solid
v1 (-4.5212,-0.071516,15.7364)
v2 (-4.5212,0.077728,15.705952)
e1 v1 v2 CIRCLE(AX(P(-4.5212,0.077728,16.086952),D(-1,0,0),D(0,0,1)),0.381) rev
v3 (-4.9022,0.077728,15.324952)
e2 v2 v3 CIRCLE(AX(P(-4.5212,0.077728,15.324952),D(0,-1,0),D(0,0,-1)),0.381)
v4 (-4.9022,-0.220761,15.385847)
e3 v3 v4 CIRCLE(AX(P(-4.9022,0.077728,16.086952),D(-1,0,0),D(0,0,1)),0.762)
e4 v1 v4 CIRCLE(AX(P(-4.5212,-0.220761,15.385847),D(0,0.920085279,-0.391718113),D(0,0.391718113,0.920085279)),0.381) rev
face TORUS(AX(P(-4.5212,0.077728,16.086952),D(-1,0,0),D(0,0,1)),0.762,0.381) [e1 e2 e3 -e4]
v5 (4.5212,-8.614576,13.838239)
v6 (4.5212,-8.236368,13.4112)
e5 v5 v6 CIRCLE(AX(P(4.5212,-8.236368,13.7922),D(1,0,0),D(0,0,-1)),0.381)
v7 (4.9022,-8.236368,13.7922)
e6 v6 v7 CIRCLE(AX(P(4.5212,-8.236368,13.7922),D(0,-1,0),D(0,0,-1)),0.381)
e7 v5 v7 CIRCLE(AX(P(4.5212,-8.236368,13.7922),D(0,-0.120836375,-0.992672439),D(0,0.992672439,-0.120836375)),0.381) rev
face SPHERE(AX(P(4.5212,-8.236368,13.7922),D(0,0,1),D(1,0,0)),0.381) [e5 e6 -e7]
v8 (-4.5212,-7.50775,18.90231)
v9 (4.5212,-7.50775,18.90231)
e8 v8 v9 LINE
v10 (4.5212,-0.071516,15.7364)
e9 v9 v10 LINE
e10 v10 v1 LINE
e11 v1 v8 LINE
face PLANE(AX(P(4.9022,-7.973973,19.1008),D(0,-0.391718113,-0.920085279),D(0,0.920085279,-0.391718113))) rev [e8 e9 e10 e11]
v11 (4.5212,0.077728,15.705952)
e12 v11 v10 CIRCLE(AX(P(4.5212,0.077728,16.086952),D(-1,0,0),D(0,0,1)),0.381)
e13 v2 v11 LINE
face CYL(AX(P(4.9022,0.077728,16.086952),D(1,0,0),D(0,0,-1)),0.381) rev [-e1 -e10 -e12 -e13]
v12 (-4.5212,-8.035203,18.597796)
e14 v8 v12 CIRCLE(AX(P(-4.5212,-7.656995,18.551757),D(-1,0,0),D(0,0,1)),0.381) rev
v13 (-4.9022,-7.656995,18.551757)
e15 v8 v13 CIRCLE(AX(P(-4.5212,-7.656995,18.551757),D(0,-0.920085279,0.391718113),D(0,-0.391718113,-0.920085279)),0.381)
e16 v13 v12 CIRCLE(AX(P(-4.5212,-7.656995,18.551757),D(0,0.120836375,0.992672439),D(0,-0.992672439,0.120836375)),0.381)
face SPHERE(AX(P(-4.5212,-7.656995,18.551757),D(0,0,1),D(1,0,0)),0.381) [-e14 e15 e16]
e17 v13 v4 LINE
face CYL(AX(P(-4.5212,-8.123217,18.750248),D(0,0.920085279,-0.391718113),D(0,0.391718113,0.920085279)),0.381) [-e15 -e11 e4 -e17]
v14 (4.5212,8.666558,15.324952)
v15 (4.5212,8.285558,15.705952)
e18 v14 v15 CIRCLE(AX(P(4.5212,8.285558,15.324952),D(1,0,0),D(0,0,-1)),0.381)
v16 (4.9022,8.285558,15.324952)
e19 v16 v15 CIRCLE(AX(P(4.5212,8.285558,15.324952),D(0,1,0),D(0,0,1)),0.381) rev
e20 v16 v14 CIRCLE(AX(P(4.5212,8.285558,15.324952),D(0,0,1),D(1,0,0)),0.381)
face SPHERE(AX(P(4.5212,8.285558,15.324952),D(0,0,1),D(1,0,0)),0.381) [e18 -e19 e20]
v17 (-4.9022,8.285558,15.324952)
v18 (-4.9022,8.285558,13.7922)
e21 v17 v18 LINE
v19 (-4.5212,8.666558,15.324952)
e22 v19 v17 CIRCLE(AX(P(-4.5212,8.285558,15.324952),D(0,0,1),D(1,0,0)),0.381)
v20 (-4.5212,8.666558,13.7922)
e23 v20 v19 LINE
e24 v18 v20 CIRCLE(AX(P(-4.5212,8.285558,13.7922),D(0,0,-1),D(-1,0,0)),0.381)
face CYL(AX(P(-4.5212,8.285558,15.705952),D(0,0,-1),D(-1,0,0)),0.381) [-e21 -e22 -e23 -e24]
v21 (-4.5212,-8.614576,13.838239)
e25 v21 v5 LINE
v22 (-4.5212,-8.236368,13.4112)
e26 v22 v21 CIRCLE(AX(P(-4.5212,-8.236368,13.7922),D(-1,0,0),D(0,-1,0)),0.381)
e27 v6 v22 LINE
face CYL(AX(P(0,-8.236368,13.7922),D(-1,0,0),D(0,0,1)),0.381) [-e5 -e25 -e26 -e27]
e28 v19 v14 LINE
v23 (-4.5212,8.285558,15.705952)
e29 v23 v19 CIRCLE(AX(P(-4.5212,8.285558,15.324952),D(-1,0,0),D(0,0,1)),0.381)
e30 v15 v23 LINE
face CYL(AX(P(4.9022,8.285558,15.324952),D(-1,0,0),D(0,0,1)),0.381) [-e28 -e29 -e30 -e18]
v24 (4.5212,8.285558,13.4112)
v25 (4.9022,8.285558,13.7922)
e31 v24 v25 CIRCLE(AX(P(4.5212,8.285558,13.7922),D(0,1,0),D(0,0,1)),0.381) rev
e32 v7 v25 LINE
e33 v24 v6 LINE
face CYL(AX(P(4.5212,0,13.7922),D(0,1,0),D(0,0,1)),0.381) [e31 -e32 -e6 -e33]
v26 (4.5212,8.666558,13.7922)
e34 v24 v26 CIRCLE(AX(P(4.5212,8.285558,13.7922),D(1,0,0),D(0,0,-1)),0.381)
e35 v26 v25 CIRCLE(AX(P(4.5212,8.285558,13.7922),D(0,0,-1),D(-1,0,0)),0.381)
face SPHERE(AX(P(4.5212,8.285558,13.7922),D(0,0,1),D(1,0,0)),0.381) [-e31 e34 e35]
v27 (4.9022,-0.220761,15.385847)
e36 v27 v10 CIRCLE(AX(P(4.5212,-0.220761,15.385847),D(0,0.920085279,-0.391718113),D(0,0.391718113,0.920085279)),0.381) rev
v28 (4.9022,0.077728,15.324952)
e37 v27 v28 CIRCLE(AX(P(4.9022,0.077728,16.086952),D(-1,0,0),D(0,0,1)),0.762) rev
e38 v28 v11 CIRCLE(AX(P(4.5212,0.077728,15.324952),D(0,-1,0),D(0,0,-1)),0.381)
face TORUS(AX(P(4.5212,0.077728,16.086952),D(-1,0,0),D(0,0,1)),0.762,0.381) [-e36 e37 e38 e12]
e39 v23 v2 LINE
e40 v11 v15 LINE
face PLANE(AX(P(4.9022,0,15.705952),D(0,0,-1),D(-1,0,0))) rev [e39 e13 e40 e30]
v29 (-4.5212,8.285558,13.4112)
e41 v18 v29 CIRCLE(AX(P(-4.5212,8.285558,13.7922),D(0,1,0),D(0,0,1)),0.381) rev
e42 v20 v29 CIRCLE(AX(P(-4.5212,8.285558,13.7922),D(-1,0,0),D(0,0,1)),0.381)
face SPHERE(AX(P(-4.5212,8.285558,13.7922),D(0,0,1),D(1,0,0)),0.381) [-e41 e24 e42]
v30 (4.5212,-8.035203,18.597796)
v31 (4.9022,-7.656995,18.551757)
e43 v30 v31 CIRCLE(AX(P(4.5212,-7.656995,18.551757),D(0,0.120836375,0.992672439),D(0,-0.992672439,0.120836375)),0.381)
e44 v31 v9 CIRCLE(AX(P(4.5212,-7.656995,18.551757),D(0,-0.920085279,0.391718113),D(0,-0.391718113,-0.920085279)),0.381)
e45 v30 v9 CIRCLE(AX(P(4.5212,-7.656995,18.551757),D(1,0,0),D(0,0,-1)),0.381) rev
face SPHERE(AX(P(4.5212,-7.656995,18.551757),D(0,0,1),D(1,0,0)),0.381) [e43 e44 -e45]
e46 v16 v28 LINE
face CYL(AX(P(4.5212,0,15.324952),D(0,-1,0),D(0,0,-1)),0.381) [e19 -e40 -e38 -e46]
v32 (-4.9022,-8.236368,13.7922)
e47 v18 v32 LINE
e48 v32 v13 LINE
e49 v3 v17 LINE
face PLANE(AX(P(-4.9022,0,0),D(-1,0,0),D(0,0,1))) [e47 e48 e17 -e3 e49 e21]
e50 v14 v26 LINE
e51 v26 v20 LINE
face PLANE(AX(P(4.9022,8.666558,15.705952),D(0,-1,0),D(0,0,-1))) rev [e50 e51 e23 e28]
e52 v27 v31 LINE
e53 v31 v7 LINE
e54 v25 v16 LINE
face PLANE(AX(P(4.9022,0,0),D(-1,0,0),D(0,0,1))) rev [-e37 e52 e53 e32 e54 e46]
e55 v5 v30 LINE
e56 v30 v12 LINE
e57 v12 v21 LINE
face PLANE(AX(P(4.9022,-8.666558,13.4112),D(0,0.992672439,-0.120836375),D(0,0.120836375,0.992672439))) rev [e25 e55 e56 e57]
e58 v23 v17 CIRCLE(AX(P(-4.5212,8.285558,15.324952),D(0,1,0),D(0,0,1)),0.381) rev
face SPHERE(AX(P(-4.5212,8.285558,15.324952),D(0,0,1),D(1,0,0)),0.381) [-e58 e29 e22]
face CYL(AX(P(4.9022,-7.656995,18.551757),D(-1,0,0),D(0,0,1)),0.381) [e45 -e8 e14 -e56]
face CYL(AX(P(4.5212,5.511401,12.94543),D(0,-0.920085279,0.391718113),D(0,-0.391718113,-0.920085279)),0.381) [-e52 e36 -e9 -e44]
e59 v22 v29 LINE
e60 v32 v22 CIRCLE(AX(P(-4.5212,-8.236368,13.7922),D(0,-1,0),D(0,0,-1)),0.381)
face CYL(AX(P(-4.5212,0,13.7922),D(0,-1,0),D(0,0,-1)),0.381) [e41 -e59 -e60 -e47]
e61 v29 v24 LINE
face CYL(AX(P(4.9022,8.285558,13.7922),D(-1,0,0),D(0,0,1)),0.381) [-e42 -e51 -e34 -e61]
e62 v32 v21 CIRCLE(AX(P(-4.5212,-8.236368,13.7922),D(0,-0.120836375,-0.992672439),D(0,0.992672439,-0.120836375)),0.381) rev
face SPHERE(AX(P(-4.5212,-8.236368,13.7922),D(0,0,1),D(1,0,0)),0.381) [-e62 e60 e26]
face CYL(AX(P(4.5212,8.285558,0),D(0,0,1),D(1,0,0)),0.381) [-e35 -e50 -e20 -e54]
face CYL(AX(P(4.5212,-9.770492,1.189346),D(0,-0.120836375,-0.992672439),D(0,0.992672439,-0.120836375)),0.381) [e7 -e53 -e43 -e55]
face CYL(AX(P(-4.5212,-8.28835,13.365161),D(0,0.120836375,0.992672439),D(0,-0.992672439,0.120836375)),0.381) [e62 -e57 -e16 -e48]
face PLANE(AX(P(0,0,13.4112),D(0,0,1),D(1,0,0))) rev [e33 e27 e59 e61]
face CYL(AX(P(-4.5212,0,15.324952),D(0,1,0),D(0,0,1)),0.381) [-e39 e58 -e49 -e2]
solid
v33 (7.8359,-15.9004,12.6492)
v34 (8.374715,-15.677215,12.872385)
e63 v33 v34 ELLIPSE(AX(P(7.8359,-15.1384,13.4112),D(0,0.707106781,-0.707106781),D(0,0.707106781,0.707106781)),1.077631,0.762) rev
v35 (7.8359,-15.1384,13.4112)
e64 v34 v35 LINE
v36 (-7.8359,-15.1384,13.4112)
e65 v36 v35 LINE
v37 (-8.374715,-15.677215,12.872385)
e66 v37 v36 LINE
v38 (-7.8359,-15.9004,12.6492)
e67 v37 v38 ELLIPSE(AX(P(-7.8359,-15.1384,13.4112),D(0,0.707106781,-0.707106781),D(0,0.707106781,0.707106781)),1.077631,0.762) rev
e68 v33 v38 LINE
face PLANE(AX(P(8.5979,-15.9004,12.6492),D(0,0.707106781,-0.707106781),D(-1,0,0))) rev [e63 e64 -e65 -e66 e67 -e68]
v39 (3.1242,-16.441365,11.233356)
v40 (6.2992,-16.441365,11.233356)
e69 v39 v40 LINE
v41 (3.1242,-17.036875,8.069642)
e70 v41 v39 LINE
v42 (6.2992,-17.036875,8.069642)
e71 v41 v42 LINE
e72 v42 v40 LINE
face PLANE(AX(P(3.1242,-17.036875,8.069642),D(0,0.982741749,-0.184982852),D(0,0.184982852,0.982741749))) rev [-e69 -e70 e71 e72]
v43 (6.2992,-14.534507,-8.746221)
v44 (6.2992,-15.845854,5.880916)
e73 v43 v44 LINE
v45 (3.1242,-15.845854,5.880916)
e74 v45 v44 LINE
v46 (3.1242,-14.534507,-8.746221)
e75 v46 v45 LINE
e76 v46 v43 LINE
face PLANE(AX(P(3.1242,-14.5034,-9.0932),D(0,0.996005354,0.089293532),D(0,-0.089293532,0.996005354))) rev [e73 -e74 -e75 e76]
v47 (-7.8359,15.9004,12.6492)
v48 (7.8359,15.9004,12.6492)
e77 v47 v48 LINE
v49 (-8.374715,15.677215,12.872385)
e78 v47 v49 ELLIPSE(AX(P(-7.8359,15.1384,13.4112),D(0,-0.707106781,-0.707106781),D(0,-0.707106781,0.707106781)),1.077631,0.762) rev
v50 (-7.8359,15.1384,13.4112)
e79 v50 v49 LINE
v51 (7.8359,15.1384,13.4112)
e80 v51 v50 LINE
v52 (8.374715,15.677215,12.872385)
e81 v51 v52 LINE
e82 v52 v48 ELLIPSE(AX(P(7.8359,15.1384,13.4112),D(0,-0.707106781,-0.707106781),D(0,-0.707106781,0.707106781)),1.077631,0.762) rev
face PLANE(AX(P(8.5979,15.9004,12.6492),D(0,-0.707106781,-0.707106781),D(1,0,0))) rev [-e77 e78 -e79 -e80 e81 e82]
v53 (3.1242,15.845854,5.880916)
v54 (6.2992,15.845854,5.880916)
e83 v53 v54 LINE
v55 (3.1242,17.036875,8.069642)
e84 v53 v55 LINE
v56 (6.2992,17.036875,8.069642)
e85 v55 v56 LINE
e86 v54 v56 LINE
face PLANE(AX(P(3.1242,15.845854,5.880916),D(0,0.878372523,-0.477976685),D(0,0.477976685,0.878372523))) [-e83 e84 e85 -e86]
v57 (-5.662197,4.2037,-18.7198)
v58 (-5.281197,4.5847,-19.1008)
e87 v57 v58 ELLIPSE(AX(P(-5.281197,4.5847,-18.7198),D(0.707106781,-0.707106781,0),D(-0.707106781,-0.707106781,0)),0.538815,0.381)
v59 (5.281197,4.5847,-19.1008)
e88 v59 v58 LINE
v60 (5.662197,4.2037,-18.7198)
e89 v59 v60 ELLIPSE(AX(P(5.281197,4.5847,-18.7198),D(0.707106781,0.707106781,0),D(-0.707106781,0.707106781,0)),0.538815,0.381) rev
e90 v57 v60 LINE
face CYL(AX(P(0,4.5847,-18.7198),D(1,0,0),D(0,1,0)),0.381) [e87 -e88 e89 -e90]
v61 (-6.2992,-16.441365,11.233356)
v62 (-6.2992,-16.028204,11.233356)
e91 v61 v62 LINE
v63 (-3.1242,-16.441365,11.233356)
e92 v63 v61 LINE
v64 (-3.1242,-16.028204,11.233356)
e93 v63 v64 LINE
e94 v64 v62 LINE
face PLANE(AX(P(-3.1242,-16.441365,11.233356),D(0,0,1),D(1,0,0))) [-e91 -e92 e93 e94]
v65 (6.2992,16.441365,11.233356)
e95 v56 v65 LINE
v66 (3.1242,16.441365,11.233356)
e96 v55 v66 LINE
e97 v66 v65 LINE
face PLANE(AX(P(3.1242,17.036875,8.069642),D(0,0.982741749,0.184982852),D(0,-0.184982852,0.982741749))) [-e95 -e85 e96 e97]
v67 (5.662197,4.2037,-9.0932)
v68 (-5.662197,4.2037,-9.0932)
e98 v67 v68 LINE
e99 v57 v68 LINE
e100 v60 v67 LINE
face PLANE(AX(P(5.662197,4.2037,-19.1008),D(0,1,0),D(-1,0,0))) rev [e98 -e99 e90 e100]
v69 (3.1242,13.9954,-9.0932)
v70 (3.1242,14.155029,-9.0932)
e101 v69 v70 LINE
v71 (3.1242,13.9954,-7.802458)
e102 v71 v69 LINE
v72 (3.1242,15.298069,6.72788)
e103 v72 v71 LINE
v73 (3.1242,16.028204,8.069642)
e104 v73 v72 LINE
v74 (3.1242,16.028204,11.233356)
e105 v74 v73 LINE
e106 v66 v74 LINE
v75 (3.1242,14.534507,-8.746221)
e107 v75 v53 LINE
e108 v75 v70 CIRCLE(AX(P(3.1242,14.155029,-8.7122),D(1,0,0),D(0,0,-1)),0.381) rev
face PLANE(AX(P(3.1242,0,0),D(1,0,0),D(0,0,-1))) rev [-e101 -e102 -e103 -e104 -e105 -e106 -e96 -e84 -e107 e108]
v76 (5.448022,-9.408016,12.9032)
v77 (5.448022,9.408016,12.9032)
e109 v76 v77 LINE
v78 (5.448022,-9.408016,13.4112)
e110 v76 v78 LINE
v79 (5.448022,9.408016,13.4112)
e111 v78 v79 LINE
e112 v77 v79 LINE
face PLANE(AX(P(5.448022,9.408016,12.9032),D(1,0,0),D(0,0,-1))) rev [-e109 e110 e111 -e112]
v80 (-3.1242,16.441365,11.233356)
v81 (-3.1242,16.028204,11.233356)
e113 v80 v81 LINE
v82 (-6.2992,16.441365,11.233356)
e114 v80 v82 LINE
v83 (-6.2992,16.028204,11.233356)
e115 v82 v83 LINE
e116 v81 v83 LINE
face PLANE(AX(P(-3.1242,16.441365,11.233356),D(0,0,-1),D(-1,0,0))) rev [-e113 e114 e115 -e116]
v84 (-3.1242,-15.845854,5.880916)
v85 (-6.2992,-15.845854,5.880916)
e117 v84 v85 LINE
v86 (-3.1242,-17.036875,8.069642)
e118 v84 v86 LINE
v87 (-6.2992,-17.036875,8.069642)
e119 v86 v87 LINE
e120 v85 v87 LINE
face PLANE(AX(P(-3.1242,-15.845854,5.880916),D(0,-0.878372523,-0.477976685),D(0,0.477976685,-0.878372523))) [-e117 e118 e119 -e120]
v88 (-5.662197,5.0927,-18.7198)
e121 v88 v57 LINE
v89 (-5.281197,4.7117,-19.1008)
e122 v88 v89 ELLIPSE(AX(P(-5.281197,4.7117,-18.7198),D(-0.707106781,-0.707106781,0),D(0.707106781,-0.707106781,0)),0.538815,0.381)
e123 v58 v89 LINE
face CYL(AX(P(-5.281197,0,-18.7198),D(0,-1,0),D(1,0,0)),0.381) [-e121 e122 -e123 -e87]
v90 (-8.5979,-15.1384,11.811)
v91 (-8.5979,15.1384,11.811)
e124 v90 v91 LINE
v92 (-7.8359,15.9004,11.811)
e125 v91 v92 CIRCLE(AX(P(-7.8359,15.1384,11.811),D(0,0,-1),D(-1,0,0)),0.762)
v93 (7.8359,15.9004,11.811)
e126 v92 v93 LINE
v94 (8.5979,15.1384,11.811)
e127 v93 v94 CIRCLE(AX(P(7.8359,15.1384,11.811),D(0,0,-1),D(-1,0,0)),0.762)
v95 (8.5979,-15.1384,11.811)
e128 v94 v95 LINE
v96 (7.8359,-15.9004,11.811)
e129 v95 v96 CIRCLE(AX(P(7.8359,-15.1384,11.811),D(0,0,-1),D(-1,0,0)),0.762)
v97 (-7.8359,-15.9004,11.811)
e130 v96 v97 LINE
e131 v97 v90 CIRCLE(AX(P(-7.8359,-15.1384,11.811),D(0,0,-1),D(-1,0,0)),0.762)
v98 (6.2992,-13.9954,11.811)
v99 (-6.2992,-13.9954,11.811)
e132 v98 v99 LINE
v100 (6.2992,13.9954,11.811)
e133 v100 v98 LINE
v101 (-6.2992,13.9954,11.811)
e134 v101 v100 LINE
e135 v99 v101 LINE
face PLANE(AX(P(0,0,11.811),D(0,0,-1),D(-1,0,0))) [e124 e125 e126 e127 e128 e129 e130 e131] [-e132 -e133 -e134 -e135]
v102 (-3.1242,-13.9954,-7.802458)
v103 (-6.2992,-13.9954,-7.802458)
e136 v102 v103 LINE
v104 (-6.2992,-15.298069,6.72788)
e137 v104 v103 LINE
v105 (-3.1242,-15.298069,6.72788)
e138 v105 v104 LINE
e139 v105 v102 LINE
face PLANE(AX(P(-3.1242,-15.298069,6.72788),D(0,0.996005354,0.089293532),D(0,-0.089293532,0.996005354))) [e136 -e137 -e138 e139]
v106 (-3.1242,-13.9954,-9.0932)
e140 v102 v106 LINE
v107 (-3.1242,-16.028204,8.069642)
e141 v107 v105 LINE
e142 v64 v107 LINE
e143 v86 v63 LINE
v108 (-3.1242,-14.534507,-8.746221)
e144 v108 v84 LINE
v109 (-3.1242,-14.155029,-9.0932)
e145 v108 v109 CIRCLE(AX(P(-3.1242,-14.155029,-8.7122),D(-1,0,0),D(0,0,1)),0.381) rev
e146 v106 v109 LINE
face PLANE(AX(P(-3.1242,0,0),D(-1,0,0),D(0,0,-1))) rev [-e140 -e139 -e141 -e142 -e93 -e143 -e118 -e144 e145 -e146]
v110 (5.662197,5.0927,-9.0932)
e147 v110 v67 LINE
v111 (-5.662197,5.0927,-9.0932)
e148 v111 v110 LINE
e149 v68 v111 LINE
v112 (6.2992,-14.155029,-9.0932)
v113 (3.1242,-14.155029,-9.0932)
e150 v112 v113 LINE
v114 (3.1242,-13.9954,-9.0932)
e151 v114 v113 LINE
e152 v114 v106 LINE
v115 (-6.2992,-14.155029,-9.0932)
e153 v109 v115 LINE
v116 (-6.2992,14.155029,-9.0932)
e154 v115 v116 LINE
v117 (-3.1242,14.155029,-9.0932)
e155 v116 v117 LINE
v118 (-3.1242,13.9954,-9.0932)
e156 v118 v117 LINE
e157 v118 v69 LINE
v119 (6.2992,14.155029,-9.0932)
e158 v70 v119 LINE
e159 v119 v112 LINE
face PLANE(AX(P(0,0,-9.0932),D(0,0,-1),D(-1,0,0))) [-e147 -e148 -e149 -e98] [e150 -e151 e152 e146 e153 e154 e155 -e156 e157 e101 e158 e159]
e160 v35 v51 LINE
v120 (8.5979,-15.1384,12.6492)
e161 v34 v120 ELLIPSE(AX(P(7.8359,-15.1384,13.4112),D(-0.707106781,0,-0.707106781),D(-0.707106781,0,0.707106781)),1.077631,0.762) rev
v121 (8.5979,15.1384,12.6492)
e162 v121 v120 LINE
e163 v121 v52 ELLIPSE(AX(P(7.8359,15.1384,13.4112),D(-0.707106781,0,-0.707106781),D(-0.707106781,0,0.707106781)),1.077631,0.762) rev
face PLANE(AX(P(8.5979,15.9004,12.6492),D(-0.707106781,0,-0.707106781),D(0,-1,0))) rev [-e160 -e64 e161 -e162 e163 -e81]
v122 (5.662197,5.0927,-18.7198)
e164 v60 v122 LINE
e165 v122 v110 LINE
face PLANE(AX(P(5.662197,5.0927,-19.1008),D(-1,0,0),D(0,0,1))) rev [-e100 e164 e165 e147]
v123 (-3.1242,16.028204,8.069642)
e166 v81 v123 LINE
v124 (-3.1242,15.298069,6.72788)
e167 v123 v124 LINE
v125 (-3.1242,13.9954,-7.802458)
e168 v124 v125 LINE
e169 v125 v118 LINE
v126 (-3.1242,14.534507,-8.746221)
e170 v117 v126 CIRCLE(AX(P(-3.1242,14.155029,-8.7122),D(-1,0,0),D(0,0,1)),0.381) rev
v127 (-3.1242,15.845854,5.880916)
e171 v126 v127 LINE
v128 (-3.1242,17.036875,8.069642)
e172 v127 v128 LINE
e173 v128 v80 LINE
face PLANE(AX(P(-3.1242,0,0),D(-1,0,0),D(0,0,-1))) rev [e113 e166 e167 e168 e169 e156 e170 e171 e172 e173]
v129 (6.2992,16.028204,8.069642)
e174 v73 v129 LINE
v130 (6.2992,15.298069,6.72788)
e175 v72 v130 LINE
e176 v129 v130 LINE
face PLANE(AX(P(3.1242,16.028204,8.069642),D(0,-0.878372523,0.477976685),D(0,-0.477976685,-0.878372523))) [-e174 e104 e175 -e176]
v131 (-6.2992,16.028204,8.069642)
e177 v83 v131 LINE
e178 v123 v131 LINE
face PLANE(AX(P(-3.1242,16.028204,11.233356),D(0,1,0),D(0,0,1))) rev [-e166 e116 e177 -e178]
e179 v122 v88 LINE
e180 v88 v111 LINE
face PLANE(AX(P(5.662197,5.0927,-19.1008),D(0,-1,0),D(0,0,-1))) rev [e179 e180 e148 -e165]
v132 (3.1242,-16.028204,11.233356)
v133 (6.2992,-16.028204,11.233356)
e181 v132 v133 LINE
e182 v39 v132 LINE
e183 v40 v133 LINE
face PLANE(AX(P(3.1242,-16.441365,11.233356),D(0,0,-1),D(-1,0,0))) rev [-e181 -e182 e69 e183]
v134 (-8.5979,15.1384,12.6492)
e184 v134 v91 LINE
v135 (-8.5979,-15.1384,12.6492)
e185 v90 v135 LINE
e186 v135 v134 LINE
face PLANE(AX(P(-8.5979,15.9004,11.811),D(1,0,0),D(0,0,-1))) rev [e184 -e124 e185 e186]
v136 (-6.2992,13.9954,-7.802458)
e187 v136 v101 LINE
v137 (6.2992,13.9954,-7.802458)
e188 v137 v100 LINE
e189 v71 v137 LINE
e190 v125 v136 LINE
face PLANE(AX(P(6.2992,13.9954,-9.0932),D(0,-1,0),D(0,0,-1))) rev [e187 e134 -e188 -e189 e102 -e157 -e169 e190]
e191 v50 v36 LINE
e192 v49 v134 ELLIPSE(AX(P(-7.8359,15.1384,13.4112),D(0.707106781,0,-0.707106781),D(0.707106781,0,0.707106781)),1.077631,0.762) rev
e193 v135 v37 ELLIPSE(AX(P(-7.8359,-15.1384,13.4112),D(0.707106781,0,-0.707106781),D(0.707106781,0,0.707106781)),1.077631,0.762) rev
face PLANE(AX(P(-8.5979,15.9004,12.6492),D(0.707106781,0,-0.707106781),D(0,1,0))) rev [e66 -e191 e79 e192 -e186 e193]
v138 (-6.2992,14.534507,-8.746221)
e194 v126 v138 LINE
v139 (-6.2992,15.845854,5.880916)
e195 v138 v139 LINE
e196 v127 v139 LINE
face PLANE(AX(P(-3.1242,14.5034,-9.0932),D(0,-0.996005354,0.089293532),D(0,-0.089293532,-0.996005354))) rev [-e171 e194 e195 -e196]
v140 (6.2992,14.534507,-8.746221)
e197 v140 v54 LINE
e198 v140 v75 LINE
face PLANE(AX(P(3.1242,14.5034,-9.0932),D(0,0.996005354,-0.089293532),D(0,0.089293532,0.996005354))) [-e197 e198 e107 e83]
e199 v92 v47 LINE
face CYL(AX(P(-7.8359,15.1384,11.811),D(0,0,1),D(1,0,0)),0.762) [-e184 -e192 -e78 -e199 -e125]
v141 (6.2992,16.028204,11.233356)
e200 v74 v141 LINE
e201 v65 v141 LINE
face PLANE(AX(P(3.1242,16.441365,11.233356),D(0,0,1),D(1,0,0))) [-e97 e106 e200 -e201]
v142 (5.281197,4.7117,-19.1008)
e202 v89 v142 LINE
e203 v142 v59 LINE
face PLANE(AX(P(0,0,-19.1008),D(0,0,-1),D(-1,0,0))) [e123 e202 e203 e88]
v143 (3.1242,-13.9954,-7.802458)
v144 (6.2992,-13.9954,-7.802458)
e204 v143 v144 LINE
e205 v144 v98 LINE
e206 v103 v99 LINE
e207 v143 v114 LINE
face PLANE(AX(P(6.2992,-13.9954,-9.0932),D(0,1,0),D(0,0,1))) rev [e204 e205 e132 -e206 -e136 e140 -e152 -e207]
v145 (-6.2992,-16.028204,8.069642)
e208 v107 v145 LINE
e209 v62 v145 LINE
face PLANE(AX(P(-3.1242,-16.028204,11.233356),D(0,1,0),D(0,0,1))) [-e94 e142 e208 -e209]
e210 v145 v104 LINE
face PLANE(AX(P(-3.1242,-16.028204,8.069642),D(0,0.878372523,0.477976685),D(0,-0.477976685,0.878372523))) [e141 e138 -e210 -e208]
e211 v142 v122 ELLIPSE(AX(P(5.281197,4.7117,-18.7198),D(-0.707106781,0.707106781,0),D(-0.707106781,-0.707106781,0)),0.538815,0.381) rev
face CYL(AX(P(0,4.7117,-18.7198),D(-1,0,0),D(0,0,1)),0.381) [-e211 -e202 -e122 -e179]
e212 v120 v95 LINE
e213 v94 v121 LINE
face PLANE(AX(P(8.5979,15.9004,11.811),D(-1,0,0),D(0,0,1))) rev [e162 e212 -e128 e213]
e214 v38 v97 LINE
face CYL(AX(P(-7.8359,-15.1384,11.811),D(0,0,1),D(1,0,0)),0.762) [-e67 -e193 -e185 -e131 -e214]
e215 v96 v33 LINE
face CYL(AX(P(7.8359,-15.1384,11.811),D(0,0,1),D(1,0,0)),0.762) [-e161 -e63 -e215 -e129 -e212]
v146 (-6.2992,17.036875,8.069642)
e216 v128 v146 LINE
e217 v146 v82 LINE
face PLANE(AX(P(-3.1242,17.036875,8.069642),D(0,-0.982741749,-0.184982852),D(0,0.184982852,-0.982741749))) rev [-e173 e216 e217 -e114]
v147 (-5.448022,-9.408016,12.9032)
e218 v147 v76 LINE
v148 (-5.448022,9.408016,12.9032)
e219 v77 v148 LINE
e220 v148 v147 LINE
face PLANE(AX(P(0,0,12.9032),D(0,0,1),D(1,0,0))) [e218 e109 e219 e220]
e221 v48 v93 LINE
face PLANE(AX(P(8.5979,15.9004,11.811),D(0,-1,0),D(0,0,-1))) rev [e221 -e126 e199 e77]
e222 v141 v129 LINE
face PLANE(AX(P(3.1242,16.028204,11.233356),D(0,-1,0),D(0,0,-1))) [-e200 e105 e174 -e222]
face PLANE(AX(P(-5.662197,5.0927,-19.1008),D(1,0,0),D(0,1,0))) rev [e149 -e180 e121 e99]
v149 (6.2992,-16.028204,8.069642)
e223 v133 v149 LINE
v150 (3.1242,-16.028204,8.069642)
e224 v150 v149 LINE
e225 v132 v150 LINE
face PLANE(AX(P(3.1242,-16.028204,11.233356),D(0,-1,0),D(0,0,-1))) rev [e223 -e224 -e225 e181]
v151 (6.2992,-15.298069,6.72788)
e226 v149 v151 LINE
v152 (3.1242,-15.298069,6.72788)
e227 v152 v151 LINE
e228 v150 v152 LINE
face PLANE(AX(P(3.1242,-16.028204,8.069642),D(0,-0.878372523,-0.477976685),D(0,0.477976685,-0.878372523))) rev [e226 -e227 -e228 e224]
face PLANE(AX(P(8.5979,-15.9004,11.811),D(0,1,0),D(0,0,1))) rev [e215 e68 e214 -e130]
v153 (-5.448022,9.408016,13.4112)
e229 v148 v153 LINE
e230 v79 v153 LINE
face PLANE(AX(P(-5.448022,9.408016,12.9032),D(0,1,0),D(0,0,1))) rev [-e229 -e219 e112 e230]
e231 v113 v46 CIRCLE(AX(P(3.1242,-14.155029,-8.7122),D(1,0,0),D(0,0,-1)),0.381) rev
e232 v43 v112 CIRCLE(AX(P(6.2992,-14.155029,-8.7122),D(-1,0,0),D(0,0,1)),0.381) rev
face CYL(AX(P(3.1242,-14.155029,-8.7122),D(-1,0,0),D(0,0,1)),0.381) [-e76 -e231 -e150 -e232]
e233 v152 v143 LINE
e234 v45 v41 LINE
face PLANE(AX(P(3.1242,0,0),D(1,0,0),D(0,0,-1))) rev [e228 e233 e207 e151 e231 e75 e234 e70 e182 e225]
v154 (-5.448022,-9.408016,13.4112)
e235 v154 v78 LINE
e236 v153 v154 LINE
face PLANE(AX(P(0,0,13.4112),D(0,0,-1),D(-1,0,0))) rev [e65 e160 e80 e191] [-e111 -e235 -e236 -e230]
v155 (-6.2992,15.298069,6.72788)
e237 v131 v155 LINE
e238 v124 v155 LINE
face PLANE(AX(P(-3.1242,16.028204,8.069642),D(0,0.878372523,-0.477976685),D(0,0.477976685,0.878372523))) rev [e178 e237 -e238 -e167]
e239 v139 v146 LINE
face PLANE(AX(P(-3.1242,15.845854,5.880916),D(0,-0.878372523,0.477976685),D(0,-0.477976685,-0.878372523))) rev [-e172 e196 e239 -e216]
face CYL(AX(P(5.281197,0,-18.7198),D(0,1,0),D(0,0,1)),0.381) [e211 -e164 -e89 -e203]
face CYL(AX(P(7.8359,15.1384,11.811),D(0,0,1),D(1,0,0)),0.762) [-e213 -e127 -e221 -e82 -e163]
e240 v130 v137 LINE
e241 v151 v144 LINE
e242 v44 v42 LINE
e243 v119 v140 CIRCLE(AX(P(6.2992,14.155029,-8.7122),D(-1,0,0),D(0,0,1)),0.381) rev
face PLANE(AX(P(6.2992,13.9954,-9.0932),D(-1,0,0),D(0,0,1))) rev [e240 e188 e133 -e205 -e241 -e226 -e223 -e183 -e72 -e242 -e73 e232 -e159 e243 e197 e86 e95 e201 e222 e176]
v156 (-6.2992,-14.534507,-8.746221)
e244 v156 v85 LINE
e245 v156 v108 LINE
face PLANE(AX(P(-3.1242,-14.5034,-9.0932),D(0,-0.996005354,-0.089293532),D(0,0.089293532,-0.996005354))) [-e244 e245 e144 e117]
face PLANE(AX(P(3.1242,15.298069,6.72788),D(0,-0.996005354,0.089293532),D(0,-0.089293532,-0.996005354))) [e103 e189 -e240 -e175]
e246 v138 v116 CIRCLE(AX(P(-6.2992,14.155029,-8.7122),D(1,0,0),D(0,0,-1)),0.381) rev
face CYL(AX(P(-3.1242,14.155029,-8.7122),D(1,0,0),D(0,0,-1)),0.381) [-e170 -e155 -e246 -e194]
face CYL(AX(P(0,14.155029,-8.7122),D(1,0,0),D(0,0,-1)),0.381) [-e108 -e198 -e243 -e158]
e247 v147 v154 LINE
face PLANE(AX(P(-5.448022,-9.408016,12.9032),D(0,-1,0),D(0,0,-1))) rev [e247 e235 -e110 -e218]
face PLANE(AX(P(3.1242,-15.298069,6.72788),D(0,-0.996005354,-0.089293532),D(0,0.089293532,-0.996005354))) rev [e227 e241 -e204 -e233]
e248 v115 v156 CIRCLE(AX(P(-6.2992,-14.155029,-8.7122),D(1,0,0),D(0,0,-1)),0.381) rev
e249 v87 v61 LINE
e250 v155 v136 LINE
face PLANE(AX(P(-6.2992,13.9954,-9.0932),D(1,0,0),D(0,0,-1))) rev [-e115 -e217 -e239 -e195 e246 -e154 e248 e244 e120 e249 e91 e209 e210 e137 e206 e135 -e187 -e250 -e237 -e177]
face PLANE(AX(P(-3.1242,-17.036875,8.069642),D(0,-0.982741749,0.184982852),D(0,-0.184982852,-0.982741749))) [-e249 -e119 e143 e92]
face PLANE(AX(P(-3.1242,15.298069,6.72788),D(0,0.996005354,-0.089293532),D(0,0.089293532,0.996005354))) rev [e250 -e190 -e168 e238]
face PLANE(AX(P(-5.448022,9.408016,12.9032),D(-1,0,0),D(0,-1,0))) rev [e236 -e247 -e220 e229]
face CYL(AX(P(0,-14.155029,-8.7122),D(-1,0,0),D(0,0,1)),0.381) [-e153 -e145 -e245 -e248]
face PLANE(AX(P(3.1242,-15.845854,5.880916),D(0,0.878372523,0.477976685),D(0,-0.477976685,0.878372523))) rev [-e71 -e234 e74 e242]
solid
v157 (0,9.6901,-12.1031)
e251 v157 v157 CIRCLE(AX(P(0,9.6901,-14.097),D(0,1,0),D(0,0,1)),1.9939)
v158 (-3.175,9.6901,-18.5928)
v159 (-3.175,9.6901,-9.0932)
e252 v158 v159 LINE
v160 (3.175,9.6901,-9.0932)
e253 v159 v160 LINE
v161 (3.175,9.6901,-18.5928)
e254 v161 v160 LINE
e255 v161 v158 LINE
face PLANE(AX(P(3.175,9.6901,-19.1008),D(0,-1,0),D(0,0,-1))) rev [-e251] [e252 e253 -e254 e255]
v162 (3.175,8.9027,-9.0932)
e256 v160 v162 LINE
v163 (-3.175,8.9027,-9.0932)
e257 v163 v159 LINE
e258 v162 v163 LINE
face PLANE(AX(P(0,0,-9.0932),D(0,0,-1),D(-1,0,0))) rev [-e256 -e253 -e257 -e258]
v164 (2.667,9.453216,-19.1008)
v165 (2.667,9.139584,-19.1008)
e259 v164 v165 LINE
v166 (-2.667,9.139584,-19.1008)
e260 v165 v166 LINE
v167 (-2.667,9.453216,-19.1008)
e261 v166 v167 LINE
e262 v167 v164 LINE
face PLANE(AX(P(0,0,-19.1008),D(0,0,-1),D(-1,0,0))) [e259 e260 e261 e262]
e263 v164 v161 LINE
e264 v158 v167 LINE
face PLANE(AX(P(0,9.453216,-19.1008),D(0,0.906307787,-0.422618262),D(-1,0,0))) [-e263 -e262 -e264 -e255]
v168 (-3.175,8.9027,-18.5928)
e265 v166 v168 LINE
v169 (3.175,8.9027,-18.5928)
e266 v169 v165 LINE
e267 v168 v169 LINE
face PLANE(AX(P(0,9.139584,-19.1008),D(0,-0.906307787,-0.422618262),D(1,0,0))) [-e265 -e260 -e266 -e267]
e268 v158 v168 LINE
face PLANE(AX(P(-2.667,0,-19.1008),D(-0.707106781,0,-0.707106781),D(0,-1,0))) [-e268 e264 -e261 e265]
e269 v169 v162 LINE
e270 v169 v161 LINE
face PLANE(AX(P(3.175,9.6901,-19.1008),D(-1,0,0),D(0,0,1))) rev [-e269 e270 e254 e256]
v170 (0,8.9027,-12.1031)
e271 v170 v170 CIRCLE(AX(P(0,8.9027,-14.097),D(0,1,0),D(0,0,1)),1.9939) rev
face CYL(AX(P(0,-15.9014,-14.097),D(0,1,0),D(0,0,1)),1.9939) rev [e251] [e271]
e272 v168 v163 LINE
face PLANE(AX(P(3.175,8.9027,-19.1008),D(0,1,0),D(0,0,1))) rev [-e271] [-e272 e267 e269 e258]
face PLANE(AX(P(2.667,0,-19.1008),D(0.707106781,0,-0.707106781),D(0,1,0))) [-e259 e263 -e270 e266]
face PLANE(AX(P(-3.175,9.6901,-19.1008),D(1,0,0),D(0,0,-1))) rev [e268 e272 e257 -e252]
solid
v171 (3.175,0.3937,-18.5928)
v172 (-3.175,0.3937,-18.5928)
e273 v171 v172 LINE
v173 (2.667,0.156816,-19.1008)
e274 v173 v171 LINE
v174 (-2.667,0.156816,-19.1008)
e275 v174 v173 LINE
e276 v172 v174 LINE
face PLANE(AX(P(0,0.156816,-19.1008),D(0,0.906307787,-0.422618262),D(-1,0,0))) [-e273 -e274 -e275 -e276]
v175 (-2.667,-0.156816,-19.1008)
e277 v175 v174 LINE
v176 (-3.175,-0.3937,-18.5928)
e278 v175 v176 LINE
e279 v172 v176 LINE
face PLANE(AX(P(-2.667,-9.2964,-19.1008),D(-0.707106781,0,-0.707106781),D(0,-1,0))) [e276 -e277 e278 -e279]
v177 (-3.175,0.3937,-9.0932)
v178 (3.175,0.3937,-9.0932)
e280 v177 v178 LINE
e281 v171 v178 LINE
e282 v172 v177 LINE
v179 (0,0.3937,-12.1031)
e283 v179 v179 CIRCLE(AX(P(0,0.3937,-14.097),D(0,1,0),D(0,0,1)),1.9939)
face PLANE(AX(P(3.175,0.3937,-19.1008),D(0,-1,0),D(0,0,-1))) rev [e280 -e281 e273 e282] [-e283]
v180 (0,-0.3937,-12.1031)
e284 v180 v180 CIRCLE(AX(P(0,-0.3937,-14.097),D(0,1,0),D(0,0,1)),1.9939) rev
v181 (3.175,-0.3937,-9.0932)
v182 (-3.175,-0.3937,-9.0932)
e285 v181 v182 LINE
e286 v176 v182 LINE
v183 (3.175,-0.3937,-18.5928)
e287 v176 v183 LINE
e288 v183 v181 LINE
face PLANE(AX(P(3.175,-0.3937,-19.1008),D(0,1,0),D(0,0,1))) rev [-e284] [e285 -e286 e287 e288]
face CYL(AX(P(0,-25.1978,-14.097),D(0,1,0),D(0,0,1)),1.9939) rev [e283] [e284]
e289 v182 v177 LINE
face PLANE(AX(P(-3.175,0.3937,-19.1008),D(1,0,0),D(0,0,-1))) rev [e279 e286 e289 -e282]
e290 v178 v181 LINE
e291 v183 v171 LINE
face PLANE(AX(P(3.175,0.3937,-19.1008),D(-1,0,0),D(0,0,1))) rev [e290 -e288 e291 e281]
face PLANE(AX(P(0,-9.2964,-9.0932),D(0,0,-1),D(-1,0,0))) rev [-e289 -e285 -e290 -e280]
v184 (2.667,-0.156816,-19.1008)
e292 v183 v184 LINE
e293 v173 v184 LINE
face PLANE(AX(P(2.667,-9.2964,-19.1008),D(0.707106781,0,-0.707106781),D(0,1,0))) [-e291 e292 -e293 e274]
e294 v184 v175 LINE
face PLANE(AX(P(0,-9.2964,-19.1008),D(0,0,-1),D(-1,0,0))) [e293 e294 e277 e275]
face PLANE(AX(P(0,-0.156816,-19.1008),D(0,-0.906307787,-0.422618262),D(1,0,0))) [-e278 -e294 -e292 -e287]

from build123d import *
from OCP.BRepFilletAPI import BRepFilletAPI_MakeChamfer

# Parameters (mm, degrees)
BOSS_EXTRUDE1_DEPTH  = 4.9022
SKETCH3_W            = 17.1958
SKETCH3_H            = 31.8008
BOSS_EXTRUDE2_DEPTH  = 1.6002
CHAMFER1_SIZE        = 0.762
SKETCH4_W            = 10.896044092
SKETCH4_H            = 18.816032884
CUT_EXTRUDE2_DEPTH   = 0.508
SKETCH5_W            = 12.5984
SKETCH5_H            = 27.9908
BOSS_EXTRUDE3_DEPTH  = 20.9042
SKETCH6_W            = 6.35
SKETCH6_H            = 0.7874
BOSS_EXTRUDE4_DEPTH  = 10.0076
CHAMFER2_SIZE        = 0.508
CHAMFER3_SIZE        = 0.508
CHAMFER3_SIZE2       = 0.23688429
SKETCH7_R            = 1.9939
CUT_EXTRUDE3_DEPTH   = 0.7874
LPATTERN1_COUNT      = 2
LPATTERN1_PITCH      = 9.2964
SKETCH9_W            = 11.324393704
SKETCH9_H            = 0.889
BOSS_EXTRUDE5_DEPTH  = 10.0076
FILLET1_R            = 0.381
BOSS_EXTRUDE6_DEPTH  = 3.175
FILLET2_R            = 0.381
FILLET2_OF_MIRROR3_R = 0.381
MIRROR4_START        = -6.2992
MIRROR4_DEPTH        = 3.175
MIRROR4_START_2      = 3.1242
MIRROR4_2_DEPTH      = 3.175
FILLET3_R            = 0.381
FILLET4_R            = 0.762


# Read off the part's stored shape, not the designer's step: Mirror4
with BuildPart() as part:
    # Sketch2 → Boss-Extrude1 (new, symmetric)
    with BuildSketch(Plane(origin=(0, 0, 0), x_dir=(0, 0, -1), z_dir=(1, 0, 0))):
        Polygon((-19.1008, -7.973972857), (-15.705952073, 0), (-15.705952073, 8.666558462), (-13.4112, 8.666558462), (-13.4112, -8.666558462), align=None)
    extrude(amount=BOSS_EXTRUDE1_DEPTH, both=True)

    # Sketch3 → Boss-Extrude2 (add)
    with BuildSketch(Plane(origin=(0, 0, 13.4112), x_dir=(-1, 0, 0), z_dir=(0, 0, -1))):
        Rectangle(SKETCH3_W, SKETCH3_H)
    extrude(amount=BOSS_EXTRUDE2_DEPTH)

    # Chamfer1
    chamfer1_edges = [part.edges().sort_by_distance(p)[0] for p in [
        (-8.5979, 0, 13.4112),
        (0, 15.9004, 13.4112),
        (8.5979, 0, 13.4112),
        (0, -15.9004, 13.4112),
    ]]
    chamfer(chamfer1_edges, length=CHAMFER1_SIZE)

    # Sketch4 → Cut-Extrude2 (cut)
    with BuildSketch(Plane.XY.offset(13.4112)):
        Rectangle(SKETCH4_W, SKETCH4_H)
    extrude(amount=-CUT_EXTRUDE2_DEPTH, mode=Mode.SUBTRACT)


with BuildPart() as cut_extrude2_piece_1:
    # of the separate pieces the step leaves, piece 1, a body of its own (cut_extrude2_pieces)
    add(part.part.solids().sort_by_distance((8.5979, 15.9004, 12.6492))[0])

    # Sketch5 → Boss-Extrude3 (add)
    with BuildSketch(Plane(origin=(0, 0, 11.811), x_dir=(-1, 0, 0), z_dir=(0, 0, -1))):
        Rectangle(SKETCH5_W, SKETCH5_H)
    extrude(amount=BOSS_EXTRUDE3_DEPTH)

    # Sketch9 → Boss-Extrude5 (add)
    with BuildSketch(Plane(origin=(0, 0, -9.0932), x_dir=(-1, 0, 0), z_dir=(0, 0, -1))):
        with Locations((0, 4.6482)):
            Rectangle(SKETCH9_W, SKETCH9_H)
    extrude(amount=BOSS_EXTRUDE5_DEPTH)

    # Fillet1
    fillet1_edges = [cut_extrude2_piece_1.edges().sort_by_distance(p)[0] for p in [
        (-5.662196852, 4.6482, -19.1008),
        (0, 5.0927, -19.1008),
        (5.662196852, 4.6482, -19.1008),
        (0, 4.2037, -19.1008),
    ]]
    fillet(fillet1_edges, radius=FILLET1_R)

    # Sketch11 → Boss-Extrude6 (add)
    with BuildSketch(Plane(origin=(6.2992, 0, 0), x_dir=(0, 0, -1), z_dir=(1, 0, 0))):
        Polygon((9.0932, 13.9954), (9.0932, 14.5034), (-5.880915867, 15.845854324), (-8.069641774, 17.036875135), (-11.233356301, 16.44136473), (-11.233356301, 16.028204475), (-8.069641774, 16.028204475), (-6.727879648, 15.298068915), (7.80245849, 13.9954), align=None)
    boss_extrude6 = extrude(amount=-BOSS_EXTRUDE6_DEPTH)

    # Fillet2
    fillet2_edges = [cut_extrude2_piece_1.edges().sort_by_distance(p)[0] for p in [
        (4.7117, 14.5034, -9.0932),
    ]]
    fillet(fillet2_edges, radius=FILLET2_R)

    # Mirror3: Boss-Extrude6 across plane
    add(boss_extrude6.mirror(Plane(origin=(0, 0, 0), x_dir=(0, 0, 1), z_dir=(1, 0, 0))))

    # Fillet2 of Mirror3
    fillet2_of_mirror3_edges = [cut_extrude2_piece_1.edges().sort_by_distance(p)[0] for p in [
        (-4.7117, 14.5034, -9.0932),
    ]]
    fillet(fillet2_of_mirror3_edges, radius=FILLET2_OF_MIRROR3_R)

    # Mirror4 outline → Mirror4 (add)
    with BuildSketch(Plane.YZ.offset(MIRROR4_START)):
        with BuildLine():
            Line((-16.028204475, 8.069641774), (-16.028204475, 11.233356301))
            Line((-16.028204475, 11.233356301), (-16.44136473, 11.233356301))
            Line((-16.44136473, 11.233356301), (-17.036875135, 8.069641774))
            Line((-17.036875135, 8.069641774), (-15.845854324, 5.880915867))
            Line((-15.845854324, 5.880915867), (-14.534507258, -8.746220836))
            ThreePointArc((-14.534507258, -8.746220836), (-14.412127508, -8.993378714), (-14.155029218, -9.0932))
            Line((-14.155029218, -9.0932), (-13.9954, -9.0932))
            Line((-13.9954, -9.0932), (-13.9954, -7.80245849))
            Line((-13.9954, -7.80245849), (-15.298068915, 6.727879648))
            Line((-15.298068915, 6.727879648), (-16.028204475, 8.069641774))
        make_face()
    extrude(amount=MIRROR4_DEPTH)

    # Mirror4 2 outline → Mirror4 2 (add)
    with BuildSketch(Plane.YZ.offset(MIRROR4_START_2)):
        with BuildLine():
            Line((-16.028204475, 8.069641774), (-16.028204475, 11.233356301))
            Line((-16.028204475, 11.233356301), (-16.44136473, 11.233356301))
            Line((-16.44136473, 11.233356301), (-17.036875135, 8.069641774))
            Line((-17.036875135, 8.069641774), (-15.845854324, 5.880915867))
            Line((-15.845854324, 5.880915867), (-14.534507258, -8.746220836))
            ThreePointArc((-14.534507258, -8.746220836), (-14.412127508, -8.993378714), (-14.155029218, -9.0932))
            Line((-14.155029218, -9.0932), (-13.9954, -9.0932))
            Line((-13.9954, -9.0932), (-13.9954, -7.80245849))
            Line((-13.9954, -7.80245849), (-15.298068915, 6.727879648))
            Line((-15.298068915, 6.727879648), (-16.028204475, 8.069641774))
        make_face()
    extrude(amount=MIRROR4_2_DEPTH)

    # Fillet4
    fillet4_edges = [cut_extrude2_piece_1.edges().sort_by_distance(p)[0] for p in [
        (-8.5979, -15.9004, 12.2301),
        (-8.5979, 15.9004, 12.2301),
        (8.5979, 15.9004, 12.2301),
        (8.5979, -15.9004, 12.2301),
    ]]
    fillet(fillet4_edges, radius=FILLET4_R)


with BuildPart() as cut_extrude2_piece_2:
    # of the separate pieces the step leaves, piece 2, a body of its own (cut_extrude2_pieces)
    add(part.part.solids().sort_by_distance((-4.9022, 8.666558462, 15.705952073))[0])

    # Fillet3
    fillet3_edges = [cut_extrude2_piece_2.edges().sort_by_distance(p)[0] for p in [
        (4.9022, 8.666558462, 14.558576037),
        (4.9022, 4.333279231, 15.705952073),
        (4.9022, -3.986986428, 17.403376037),
        (4.9022, -8.320265659, 16.256),
        (-4.9022, -3.986986428, 17.403376037),
        (-4.9022, 4.333279231, 15.705952073),
        (-4.9022, 8.666558462, 14.558576037),
        (-4.9022, 0, 13.4112),
        (-4.9022, -8.320265659, 16.256),
        (4.9022, 0, 13.4112),
        (0, -7.973972857, 19.1008),
        (0, 0, 15.705952073),
        (0, 8.666558462, 15.705952073),
        (0, 8.666558462, 13.4112),
        (0, -8.666558462, 13.4112),
    ]]
    fillet(fillet3_edges, radius=FILLET3_R)


with BuildPart() as body_3:
    # Sketch6 → Boss-Extrude4 (new body)
    with BuildSketch(Plane(origin=(0, 0, -9.0932), x_dir=(-1, 0, 0), z_dir=(0, 0, -1))):
        with Locations((0, 9.2964)):
            Rectangle(SKETCH6_W, SKETCH6_H)
    extrude(amount=BOSS_EXTRUDE4_DEPTH)

    # Chamfer2
    chamfer2_edges = [body_3.edges().sort_by_distance(p)[0] for p in [
        (3.175, 9.2964, -19.1008),
        (-3.175, 9.2964, -19.1008),
    ]]
    chamfer(chamfer2_edges, length=CHAMFER2_SIZE)

    # Chamfer3: one chamfer whose edges measure the first distance from different faces: ONE call of the kernel's chamfer builder (chamfer() names one face for all edges)
    chamfer3_edges_1 = [body_3.edges().sort_by_distance(p)[0] for p in [
        (0, 8.9027, -19.1008),
    ]]
    chamfer3_side_1 = [body_3.faces().sort_by_distance(p)[0] for p in [
        (0, 8.9027, -14.077287598),
    ]]
    chamfer3_edges_2 = [body_3.edges().sort_by_distance(p)[0] for p in [
        (0, 9.6901, -19.1008),
    ]]
    chamfer3_side_2 = [body_3.faces().sort_by_distance(p)[0] for p in [
        (0, 9.6901, -14.077287598),
    ]]
    chamfer3 = BRepFilletAPI_MakeChamfer(body_3.part.solid().wrapped)
    for e in chamfer3_edges_1:
        chamfer3.Add(CHAMFER3_SIZE, CHAMFER3_SIZE2, e.wrapped, chamfer3_side_1[0].wrapped)  # the first distance lies on this face
    for e in chamfer3_edges_2:
        chamfer3.Add(CHAMFER3_SIZE, CHAMFER3_SIZE2, e.wrapped, chamfer3_side_2[0].wrapped)  # the first distance lies on this face
    add(Compound.cast(chamfer3.Shape()), mode=Mode.REPLACE)

    # Sketch7 → Cut-Extrude3 (cut)
    with BuildSketch(Plane(origin=(0, 9.6901, 0), x_dir=(1, 0, 0), z_dir=(0, 1, 0))):
        with Locations(Location((0, 14.097, 0), (0, 0, 270))):
            Circle(SKETCH7_R)
    extrude(amount=-CUT_EXTRUDE3_DEPTH, mode=Mode.SUBTRACT)


with BuildPart() as lpattern1_1:
    # LPattern1: pattern copy
    add(body_3.part.moved(Location(Vector(0, -1, 0) * (1 * LPATTERN1_PITCH))))


solid = Compound([cut_extrude2_piece_1.part, cut_extrude2_piece_2.part, body_3.part, lpattern1_1.part])
